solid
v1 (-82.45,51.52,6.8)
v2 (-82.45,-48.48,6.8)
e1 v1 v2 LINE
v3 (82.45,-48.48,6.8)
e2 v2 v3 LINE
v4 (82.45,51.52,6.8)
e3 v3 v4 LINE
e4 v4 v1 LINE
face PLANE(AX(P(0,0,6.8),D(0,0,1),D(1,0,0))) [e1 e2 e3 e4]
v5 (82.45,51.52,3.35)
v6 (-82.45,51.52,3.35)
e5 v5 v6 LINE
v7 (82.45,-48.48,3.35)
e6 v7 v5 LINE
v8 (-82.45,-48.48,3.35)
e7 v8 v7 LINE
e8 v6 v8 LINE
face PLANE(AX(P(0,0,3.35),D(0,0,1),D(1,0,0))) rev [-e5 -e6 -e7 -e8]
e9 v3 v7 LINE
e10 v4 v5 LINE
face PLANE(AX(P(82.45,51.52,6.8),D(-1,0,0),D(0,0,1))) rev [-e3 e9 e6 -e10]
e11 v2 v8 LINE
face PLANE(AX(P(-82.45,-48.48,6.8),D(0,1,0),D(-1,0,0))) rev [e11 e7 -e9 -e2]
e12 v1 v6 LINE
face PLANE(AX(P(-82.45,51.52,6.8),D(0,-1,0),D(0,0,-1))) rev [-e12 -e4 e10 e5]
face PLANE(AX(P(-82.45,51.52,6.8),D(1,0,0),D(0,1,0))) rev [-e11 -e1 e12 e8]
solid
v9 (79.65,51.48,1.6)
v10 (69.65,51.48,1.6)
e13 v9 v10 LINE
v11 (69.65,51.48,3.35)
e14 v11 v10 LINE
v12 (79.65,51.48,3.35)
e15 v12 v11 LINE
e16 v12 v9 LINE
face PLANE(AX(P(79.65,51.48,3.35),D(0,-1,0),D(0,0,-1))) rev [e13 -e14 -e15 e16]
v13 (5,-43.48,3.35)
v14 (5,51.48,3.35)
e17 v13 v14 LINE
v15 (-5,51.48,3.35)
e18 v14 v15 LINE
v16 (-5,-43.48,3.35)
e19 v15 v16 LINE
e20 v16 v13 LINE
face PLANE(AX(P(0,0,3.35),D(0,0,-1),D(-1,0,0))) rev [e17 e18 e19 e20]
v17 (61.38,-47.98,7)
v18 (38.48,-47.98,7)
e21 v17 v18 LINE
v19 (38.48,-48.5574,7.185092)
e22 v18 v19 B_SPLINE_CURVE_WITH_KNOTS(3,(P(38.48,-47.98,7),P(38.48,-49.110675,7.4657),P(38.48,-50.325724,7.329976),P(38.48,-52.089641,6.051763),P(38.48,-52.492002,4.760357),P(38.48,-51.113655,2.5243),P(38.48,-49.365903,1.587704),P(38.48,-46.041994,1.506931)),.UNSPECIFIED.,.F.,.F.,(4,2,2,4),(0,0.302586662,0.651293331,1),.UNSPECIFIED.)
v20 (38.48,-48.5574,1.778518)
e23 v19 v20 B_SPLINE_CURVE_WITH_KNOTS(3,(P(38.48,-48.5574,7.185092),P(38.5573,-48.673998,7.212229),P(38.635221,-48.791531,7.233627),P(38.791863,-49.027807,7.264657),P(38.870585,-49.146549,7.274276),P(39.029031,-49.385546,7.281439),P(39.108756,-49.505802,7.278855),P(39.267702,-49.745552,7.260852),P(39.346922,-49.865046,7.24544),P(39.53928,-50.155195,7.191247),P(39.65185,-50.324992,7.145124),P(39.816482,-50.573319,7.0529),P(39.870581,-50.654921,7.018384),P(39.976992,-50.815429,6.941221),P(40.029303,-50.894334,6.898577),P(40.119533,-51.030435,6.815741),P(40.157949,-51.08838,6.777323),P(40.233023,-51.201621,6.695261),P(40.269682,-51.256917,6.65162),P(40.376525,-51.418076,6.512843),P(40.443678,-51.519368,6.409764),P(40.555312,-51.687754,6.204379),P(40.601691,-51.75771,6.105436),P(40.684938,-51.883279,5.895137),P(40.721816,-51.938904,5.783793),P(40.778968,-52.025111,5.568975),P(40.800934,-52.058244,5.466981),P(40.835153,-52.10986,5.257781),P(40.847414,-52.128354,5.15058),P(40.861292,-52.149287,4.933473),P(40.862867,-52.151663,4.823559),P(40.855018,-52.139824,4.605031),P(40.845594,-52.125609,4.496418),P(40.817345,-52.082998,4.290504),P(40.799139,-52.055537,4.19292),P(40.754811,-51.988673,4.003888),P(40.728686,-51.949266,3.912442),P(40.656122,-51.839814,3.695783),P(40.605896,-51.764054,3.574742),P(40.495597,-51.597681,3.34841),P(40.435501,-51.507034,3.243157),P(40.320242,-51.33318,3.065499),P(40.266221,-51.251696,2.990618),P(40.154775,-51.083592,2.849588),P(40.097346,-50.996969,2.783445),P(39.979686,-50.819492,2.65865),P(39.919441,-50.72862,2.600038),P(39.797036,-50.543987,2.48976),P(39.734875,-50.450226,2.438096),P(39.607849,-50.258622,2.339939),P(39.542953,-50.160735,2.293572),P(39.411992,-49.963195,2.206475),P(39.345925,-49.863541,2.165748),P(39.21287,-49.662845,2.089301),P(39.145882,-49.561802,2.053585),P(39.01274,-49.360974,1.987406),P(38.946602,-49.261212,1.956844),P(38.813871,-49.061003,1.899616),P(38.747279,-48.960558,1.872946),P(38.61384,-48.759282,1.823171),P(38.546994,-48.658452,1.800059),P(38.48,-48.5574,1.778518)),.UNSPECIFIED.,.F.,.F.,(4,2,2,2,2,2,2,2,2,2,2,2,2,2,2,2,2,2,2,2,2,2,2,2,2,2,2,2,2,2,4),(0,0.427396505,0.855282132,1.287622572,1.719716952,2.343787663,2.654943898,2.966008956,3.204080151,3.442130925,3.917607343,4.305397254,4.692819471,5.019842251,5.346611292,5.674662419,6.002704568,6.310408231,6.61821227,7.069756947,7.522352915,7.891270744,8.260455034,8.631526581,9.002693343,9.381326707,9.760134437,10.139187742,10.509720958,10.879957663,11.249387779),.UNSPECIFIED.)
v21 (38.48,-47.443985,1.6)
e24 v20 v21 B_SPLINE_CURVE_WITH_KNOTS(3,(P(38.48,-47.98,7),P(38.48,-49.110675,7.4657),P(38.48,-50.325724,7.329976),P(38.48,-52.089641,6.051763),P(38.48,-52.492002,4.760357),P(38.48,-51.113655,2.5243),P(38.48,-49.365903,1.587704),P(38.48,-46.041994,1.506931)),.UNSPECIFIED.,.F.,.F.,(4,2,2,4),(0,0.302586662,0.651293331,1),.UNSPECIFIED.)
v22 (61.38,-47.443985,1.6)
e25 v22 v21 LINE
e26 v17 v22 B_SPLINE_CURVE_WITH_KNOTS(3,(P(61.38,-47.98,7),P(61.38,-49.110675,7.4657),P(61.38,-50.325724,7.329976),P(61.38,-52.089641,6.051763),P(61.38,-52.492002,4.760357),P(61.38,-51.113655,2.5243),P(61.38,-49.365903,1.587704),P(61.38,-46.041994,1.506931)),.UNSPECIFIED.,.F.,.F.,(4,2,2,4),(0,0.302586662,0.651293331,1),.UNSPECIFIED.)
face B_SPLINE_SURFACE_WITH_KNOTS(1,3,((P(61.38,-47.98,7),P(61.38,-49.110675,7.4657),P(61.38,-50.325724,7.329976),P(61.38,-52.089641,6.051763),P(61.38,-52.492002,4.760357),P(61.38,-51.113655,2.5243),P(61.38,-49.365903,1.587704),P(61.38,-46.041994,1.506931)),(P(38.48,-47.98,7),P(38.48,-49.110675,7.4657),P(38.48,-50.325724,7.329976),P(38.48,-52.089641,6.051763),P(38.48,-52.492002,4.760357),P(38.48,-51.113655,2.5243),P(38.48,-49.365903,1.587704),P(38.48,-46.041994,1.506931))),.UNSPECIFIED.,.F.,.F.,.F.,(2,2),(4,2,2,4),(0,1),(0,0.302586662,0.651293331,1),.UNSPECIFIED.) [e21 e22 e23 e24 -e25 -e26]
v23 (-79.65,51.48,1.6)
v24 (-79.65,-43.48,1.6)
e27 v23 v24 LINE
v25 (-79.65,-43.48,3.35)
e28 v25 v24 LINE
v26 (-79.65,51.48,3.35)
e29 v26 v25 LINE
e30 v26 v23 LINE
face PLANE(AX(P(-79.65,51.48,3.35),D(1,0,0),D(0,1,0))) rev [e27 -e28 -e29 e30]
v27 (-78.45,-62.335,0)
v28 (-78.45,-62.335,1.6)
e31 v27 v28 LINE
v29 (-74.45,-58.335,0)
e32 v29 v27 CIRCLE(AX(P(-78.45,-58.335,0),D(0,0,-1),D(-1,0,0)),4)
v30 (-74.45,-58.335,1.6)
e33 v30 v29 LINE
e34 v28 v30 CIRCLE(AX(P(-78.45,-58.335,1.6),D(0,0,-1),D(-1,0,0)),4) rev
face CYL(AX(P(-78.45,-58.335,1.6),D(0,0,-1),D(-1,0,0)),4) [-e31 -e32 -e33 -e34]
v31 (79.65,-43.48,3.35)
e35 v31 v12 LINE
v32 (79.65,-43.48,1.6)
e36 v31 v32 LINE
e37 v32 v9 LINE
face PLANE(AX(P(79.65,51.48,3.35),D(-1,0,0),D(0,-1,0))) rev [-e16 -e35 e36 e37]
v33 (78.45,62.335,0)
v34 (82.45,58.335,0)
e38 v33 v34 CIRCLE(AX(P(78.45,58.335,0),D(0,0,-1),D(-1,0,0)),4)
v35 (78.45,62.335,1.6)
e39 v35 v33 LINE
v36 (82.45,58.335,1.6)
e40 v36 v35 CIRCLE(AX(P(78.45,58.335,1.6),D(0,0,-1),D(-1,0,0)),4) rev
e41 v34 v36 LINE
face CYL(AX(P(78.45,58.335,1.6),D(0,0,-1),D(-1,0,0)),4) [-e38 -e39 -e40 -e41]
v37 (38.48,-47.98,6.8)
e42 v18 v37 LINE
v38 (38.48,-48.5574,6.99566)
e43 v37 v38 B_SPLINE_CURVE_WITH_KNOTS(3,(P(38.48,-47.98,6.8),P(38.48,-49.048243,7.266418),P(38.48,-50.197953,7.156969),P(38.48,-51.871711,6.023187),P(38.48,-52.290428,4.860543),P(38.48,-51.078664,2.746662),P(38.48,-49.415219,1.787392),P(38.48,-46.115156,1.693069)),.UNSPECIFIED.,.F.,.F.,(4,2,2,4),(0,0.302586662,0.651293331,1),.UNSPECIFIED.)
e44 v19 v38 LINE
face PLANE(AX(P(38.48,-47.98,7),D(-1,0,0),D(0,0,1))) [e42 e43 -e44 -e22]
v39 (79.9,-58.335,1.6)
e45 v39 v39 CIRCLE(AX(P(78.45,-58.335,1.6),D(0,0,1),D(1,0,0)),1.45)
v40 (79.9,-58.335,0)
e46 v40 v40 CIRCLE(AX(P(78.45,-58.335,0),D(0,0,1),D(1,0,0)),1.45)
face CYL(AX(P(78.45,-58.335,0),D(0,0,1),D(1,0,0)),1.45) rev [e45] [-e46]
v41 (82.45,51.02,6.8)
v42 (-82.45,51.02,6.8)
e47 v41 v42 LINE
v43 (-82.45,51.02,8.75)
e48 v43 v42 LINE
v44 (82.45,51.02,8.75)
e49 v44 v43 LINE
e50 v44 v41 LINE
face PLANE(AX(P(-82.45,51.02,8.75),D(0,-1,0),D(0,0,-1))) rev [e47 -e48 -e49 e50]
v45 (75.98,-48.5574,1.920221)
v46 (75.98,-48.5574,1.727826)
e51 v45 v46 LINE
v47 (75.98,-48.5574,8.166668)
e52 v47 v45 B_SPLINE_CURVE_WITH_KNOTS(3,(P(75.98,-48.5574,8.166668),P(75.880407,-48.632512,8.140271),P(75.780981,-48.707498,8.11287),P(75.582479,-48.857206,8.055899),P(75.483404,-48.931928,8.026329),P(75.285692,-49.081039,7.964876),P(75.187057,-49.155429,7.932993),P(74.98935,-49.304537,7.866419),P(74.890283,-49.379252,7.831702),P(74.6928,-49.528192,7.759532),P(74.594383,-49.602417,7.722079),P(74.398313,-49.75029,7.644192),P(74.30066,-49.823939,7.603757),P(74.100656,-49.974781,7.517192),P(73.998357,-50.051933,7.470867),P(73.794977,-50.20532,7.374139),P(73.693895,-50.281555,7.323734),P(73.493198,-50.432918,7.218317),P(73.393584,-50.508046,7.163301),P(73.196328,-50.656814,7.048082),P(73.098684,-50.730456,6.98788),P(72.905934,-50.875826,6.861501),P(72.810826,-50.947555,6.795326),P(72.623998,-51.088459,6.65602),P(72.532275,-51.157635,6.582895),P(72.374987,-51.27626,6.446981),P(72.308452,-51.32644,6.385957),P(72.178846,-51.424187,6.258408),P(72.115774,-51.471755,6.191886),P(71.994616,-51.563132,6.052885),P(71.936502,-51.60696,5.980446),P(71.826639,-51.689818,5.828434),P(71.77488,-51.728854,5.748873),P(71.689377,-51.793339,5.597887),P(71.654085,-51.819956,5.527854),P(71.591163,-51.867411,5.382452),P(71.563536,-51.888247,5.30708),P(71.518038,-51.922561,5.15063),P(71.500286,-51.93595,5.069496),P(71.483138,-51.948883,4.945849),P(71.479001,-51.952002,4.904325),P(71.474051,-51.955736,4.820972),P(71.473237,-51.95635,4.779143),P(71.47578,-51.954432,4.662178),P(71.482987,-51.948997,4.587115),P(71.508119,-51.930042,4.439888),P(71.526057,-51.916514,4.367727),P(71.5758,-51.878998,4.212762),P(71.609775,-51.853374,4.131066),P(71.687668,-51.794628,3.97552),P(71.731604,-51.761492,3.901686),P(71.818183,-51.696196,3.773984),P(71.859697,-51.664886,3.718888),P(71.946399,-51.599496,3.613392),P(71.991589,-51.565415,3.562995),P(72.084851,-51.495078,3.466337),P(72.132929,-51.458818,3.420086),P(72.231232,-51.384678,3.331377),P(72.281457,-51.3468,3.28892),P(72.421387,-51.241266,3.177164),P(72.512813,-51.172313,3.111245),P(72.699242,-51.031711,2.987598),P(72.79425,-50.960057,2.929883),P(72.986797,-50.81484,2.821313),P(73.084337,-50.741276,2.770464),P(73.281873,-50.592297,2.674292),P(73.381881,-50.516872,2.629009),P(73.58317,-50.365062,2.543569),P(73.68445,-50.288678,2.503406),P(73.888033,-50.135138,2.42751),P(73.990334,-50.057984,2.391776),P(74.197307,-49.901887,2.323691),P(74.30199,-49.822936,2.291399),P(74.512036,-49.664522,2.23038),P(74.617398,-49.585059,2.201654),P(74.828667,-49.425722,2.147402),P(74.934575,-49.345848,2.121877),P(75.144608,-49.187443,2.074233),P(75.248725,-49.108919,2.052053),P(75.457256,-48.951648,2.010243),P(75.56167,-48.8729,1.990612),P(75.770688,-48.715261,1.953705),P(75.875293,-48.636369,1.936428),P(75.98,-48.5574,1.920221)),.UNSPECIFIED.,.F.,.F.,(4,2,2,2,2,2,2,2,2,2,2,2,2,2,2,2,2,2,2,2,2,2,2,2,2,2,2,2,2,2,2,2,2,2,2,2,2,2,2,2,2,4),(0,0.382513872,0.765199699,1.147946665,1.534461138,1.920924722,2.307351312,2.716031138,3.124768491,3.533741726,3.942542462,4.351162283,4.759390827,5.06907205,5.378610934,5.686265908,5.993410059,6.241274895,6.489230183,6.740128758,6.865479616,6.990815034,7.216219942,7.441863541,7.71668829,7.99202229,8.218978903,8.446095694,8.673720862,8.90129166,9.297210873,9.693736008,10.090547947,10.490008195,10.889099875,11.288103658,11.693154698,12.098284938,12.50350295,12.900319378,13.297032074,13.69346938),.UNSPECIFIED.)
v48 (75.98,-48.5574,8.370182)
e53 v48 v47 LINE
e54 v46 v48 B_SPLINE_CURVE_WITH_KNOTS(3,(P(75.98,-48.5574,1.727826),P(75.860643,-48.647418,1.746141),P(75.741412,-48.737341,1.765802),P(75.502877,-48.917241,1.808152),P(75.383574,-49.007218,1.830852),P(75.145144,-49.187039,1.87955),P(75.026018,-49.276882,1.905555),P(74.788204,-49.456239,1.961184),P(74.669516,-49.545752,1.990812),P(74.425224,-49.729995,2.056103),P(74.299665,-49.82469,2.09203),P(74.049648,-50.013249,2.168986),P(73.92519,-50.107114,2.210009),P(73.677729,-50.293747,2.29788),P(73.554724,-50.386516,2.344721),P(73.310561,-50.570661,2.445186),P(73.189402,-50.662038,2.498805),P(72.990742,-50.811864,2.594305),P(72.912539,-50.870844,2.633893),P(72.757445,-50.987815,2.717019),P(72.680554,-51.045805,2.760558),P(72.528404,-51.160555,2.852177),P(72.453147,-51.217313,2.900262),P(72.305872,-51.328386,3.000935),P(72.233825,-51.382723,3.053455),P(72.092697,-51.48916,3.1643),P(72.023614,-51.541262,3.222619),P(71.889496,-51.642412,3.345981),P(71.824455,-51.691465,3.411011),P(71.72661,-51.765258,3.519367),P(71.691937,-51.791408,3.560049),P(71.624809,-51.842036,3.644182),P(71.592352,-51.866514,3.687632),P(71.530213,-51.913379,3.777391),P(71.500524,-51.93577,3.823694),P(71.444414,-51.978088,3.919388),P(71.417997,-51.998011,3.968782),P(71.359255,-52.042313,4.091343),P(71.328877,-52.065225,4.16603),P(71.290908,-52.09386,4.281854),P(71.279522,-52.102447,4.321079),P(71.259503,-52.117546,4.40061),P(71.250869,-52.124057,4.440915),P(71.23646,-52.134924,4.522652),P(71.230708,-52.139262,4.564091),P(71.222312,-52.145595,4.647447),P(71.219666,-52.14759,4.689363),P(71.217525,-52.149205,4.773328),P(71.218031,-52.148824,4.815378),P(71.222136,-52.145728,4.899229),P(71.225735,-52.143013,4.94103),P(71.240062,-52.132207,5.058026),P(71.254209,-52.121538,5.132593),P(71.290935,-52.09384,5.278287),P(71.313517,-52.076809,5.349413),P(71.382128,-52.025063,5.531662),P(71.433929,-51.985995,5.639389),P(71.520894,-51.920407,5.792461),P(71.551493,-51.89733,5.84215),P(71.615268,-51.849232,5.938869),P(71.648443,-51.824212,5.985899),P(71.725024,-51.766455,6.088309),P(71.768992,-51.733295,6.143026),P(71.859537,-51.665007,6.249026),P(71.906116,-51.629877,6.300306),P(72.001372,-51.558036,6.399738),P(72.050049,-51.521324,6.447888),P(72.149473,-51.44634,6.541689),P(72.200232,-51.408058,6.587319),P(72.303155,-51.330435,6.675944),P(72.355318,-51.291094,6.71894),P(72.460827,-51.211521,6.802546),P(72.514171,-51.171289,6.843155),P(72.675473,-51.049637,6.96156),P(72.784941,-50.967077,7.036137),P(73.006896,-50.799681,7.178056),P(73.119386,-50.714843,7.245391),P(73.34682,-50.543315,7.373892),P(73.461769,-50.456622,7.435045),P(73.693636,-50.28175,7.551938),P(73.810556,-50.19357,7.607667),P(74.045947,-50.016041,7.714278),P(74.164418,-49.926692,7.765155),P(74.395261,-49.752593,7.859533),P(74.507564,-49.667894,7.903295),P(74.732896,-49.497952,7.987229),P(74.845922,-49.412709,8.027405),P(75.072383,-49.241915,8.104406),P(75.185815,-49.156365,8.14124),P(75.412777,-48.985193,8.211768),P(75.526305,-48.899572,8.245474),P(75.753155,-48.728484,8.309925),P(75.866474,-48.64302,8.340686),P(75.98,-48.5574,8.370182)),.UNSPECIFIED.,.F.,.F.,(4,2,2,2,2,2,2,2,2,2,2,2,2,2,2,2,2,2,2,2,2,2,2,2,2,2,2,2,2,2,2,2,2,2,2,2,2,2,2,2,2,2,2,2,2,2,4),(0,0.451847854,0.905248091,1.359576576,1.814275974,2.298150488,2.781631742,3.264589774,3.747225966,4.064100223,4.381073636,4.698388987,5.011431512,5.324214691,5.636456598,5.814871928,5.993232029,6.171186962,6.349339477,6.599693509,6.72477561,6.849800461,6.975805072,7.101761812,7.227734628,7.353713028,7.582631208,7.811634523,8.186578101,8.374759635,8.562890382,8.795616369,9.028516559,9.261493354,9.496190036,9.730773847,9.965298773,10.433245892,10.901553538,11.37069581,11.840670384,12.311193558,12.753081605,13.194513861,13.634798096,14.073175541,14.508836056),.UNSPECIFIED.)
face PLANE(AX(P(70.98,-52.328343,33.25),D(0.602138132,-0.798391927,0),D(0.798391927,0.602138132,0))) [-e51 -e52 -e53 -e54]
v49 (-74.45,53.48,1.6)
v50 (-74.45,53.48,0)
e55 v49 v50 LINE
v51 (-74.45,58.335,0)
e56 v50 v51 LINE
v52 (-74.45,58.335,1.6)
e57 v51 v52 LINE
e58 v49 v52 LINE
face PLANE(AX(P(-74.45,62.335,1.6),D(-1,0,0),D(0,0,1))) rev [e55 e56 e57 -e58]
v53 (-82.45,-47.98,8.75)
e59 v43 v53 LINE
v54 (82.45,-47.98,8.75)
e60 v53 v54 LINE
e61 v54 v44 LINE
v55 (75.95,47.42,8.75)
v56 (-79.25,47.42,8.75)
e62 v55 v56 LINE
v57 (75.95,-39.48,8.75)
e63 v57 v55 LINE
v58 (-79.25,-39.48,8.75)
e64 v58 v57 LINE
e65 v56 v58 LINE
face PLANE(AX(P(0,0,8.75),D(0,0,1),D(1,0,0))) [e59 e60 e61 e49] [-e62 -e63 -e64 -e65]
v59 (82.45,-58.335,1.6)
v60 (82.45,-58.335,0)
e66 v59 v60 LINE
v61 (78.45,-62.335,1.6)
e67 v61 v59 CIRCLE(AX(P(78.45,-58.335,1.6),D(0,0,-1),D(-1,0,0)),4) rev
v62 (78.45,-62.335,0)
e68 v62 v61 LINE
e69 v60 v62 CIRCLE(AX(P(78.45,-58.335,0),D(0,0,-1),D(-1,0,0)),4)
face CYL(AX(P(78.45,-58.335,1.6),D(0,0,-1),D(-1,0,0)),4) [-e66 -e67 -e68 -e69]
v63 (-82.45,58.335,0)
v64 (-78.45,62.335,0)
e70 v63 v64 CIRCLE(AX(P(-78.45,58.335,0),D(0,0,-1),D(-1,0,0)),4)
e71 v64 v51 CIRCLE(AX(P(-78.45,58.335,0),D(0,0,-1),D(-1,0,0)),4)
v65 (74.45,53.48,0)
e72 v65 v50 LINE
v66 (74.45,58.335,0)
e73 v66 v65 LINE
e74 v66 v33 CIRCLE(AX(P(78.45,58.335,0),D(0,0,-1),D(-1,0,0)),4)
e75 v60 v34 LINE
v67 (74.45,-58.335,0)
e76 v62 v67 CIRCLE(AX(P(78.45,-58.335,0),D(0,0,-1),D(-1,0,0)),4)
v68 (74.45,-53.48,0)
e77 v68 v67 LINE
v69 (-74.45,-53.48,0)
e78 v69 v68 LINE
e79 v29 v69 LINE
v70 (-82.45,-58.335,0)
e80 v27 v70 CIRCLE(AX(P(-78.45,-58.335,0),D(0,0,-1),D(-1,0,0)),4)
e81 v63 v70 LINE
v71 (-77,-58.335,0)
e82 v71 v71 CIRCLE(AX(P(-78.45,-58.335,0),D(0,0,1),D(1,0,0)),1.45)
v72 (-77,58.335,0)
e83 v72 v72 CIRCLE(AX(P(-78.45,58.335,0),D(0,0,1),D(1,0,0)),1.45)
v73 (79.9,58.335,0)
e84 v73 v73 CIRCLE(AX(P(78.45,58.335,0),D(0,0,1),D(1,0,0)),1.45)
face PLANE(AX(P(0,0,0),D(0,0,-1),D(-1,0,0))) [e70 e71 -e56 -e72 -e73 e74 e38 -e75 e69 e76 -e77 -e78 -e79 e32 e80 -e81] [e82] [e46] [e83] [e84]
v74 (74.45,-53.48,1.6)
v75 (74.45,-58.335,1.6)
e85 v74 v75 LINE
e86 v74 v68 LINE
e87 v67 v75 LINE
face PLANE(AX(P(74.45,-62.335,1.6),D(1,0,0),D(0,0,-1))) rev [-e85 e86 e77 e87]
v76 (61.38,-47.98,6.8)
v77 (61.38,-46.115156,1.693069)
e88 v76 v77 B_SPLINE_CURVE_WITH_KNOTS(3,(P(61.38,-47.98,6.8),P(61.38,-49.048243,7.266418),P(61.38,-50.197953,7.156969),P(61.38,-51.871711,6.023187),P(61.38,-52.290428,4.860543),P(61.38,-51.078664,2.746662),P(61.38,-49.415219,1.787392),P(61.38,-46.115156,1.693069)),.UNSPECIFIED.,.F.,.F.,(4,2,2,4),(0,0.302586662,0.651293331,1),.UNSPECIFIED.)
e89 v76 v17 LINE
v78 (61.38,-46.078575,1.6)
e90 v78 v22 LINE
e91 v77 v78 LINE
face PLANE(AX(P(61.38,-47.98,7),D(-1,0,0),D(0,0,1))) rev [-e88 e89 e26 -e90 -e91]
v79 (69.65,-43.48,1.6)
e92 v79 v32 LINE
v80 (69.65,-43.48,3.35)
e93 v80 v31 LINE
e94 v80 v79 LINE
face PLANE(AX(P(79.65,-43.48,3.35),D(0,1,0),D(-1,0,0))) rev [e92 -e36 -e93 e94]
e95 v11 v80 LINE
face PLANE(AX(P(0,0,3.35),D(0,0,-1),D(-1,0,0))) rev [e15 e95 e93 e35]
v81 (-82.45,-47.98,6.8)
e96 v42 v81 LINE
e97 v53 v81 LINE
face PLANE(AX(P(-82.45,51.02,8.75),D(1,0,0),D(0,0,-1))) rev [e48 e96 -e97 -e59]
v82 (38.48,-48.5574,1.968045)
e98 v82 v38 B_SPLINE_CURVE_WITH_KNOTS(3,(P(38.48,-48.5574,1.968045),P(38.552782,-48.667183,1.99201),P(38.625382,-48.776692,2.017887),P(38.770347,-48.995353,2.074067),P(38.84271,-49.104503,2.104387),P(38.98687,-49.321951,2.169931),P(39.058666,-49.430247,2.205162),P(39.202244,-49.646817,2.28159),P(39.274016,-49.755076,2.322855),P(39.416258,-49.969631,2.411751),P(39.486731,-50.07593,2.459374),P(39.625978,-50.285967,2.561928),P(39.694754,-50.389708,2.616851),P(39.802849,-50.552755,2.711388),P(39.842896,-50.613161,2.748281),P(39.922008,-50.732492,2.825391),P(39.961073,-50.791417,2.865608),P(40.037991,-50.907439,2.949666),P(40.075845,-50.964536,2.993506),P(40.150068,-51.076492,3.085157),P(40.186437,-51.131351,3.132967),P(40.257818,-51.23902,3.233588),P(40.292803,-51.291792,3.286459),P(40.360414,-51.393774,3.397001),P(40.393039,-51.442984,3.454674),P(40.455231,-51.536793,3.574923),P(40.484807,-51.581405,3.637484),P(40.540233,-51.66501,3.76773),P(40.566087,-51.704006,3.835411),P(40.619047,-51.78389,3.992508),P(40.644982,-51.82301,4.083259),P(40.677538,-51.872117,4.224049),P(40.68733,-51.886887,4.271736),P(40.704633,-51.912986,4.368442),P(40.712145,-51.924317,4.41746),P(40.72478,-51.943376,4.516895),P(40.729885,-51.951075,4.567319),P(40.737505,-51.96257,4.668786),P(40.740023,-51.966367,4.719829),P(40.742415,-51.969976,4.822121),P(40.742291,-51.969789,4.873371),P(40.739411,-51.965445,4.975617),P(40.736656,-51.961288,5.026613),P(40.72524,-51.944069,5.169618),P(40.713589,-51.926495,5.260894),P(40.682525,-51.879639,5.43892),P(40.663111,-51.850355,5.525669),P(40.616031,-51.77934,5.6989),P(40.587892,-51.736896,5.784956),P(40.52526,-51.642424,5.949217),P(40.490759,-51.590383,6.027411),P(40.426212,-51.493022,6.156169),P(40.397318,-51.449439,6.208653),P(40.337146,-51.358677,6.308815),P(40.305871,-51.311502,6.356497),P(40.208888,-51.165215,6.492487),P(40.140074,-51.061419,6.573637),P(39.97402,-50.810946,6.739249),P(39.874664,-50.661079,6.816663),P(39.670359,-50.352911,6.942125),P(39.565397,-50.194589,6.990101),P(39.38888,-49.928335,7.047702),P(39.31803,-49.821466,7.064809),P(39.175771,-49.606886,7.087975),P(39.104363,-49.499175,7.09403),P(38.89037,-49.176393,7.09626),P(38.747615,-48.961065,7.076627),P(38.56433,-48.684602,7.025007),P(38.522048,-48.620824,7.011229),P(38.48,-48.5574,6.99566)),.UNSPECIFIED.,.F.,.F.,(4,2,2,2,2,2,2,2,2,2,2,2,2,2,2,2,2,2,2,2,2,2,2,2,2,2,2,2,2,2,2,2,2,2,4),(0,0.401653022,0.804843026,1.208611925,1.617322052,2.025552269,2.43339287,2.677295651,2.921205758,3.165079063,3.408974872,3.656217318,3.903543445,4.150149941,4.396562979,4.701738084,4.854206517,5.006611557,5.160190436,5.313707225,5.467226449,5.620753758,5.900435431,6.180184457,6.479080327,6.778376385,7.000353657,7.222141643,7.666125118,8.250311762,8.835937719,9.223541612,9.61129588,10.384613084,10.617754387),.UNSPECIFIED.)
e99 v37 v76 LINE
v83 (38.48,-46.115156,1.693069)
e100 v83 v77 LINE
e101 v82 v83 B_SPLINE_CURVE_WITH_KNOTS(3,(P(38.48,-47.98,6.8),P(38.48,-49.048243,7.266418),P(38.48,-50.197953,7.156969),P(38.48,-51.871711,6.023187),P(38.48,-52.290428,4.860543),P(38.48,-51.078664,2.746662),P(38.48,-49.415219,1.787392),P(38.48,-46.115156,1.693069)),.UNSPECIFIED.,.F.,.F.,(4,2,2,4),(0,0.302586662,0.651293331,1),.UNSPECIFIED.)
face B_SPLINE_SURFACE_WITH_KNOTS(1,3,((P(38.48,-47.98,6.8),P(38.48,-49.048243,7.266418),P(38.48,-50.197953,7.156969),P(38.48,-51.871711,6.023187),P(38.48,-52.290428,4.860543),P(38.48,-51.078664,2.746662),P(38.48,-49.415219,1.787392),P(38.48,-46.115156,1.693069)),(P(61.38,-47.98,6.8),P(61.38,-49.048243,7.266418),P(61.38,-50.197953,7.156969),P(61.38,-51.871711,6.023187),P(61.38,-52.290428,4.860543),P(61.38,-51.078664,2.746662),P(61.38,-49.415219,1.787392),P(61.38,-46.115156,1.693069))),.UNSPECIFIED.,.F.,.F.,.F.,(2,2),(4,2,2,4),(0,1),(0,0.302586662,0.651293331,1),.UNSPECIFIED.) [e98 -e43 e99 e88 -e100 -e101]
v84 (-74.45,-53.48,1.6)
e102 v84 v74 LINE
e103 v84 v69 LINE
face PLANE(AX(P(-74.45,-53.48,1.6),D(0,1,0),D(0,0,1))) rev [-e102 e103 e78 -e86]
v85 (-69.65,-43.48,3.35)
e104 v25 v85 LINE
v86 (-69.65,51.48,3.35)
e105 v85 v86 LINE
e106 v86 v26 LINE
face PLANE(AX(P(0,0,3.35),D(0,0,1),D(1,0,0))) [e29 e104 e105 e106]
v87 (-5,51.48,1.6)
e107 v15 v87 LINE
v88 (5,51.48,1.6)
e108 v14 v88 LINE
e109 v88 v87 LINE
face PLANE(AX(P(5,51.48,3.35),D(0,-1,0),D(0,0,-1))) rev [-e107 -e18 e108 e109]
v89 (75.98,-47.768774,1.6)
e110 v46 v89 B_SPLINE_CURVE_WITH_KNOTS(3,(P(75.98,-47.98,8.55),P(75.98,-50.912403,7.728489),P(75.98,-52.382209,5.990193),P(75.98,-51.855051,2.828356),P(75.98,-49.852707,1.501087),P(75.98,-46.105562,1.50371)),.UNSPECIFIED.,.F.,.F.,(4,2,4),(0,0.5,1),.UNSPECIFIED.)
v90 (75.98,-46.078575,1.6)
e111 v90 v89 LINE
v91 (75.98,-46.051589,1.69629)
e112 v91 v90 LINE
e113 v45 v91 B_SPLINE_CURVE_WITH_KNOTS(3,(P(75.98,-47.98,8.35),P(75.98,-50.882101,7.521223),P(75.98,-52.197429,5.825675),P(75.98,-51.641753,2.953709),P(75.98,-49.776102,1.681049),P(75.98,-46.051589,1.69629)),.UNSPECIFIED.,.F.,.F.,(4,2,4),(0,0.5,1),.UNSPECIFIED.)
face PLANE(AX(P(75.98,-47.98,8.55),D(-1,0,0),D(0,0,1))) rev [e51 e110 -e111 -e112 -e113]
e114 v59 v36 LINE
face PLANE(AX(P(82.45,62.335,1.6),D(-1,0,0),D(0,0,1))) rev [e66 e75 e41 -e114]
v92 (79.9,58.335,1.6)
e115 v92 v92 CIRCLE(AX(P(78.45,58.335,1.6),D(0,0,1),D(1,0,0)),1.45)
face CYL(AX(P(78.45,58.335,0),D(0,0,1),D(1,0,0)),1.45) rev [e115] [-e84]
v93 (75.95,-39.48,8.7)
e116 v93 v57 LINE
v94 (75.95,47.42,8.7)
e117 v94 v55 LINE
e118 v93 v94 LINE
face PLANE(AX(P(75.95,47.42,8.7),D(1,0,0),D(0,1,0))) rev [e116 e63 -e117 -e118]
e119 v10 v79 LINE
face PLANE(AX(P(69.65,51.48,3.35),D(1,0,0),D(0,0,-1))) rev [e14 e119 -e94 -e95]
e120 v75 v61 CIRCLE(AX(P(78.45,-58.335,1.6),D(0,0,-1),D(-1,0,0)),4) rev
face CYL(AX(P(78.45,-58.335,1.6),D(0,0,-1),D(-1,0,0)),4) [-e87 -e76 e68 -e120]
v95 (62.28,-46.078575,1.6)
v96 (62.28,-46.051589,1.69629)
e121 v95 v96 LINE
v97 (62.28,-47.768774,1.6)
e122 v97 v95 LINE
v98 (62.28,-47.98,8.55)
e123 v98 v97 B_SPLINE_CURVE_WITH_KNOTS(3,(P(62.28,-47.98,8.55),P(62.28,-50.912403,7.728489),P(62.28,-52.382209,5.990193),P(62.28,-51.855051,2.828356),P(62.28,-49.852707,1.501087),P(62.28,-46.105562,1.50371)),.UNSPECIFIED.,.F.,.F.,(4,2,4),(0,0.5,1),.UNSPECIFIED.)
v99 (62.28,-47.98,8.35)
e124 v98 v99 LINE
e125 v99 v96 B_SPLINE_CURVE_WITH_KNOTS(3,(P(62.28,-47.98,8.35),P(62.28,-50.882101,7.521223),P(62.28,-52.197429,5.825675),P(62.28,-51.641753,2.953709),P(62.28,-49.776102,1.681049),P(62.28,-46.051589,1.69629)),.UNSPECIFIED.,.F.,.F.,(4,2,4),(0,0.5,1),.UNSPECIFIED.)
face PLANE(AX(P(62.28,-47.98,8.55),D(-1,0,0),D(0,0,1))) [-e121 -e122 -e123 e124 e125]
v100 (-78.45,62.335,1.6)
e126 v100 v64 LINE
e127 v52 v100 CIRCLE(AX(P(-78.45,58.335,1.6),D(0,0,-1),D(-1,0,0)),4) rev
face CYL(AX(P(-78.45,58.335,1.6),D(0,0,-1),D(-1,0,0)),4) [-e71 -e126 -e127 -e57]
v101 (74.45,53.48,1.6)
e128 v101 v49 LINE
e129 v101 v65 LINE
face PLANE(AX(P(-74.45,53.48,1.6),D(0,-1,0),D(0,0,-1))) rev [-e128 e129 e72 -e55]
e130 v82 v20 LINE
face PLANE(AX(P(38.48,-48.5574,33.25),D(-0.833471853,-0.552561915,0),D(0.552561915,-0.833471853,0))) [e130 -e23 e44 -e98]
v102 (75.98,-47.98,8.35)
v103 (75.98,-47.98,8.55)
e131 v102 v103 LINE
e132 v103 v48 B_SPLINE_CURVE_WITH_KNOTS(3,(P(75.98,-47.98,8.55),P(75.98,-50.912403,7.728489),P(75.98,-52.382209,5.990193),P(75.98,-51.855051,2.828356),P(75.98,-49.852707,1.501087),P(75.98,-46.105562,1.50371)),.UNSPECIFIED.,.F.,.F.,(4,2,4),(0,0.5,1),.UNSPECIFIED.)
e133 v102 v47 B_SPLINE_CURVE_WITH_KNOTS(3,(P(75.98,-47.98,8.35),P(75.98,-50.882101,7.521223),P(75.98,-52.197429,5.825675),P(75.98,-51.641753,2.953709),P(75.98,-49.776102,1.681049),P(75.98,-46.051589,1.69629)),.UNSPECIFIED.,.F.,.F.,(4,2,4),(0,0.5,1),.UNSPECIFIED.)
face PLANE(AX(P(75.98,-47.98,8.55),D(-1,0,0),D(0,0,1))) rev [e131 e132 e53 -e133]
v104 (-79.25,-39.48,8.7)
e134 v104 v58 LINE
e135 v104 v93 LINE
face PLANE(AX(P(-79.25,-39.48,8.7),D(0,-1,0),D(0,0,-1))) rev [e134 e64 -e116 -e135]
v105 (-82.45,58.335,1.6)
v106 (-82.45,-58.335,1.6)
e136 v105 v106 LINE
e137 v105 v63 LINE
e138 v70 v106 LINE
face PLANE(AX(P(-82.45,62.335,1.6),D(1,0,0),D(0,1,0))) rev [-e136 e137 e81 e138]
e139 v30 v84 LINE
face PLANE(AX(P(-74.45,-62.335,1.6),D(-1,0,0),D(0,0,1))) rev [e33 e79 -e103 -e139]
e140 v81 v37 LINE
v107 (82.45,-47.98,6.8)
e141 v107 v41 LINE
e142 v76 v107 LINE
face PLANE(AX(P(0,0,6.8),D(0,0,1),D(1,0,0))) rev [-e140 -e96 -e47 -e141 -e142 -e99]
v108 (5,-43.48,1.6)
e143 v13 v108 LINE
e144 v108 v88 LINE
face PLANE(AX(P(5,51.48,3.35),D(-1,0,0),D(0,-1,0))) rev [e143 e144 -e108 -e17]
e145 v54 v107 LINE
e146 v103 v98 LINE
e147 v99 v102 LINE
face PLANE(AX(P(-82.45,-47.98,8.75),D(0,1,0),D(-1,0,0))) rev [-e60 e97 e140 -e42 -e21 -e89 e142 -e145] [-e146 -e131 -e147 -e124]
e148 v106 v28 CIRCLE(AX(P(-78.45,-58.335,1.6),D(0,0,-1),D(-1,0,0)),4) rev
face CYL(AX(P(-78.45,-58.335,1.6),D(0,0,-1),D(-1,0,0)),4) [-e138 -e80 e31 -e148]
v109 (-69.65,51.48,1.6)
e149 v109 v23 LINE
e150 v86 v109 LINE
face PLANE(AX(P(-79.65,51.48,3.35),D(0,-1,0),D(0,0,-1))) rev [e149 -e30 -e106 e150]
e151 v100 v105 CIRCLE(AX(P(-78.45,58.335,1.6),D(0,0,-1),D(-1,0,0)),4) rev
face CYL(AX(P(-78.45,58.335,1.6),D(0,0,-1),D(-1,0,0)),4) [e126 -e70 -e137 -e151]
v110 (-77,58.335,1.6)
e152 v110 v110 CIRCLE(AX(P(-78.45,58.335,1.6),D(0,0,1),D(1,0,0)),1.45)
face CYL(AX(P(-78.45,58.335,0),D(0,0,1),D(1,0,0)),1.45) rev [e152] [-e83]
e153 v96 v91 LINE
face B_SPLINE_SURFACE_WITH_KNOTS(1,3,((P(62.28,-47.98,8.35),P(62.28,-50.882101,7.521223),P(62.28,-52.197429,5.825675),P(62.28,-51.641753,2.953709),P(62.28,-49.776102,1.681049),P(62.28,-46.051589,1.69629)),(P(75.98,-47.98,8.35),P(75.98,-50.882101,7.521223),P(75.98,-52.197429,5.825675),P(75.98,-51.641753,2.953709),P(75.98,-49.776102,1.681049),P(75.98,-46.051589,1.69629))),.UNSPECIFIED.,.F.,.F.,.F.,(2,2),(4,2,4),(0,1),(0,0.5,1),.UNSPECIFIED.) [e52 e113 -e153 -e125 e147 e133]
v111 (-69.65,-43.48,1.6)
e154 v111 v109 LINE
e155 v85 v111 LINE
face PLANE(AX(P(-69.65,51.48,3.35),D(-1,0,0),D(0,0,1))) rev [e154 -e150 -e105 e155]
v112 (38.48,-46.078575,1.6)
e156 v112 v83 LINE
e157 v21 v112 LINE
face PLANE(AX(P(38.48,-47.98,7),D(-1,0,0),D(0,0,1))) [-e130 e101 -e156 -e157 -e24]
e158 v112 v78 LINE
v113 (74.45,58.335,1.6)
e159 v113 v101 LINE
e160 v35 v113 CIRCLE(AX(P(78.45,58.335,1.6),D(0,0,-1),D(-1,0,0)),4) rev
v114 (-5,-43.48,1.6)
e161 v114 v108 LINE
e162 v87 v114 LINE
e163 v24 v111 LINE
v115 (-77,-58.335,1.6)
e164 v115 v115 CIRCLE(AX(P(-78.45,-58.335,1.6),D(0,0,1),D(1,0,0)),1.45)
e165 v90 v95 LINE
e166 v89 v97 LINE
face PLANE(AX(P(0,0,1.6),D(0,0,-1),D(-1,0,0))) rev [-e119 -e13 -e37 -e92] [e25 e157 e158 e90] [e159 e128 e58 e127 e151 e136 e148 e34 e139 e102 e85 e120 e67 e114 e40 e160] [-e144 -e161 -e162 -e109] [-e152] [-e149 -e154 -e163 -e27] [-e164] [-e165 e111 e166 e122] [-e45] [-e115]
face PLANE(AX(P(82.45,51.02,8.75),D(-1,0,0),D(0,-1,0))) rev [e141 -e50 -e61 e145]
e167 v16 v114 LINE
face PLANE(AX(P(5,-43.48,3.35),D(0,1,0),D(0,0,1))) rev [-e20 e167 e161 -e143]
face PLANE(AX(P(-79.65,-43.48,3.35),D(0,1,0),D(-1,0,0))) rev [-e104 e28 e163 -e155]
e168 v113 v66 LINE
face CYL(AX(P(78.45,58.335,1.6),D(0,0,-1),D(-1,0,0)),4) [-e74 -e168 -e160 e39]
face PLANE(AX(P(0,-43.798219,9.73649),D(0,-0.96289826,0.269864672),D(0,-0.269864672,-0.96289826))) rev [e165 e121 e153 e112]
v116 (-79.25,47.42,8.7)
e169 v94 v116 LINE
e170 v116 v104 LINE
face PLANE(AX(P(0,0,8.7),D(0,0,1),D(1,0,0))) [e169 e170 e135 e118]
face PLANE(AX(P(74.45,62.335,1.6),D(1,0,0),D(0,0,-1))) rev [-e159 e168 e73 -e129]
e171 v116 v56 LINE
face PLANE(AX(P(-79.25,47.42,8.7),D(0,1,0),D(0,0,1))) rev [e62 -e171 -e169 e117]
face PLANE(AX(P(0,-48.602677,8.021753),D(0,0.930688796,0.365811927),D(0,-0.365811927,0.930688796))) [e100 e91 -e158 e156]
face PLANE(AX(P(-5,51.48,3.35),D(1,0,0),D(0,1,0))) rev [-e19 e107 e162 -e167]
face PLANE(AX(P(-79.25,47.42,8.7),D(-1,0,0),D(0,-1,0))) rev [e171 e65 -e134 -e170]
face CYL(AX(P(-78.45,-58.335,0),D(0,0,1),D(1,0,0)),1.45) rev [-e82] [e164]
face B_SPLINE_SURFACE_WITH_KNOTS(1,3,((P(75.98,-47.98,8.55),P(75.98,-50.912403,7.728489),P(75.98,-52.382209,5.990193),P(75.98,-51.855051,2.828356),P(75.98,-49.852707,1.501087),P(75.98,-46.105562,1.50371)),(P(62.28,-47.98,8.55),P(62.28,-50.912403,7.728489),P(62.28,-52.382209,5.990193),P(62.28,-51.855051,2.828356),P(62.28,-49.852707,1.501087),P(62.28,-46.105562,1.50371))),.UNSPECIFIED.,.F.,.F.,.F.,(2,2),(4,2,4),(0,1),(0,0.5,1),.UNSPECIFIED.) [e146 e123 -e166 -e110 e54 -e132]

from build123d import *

# Parameters (mm, degrees)
PCBA_DEPTH         = 1.6
FILLET1_R          = 4
SKETCH2_R          = 1.45
SCREWHOLE_DEPTH    = 104.374149211
SKETCH5_W          = 10
SKETCH5_H          = 94.96
TAPE_DEPTH         = 1.75
SKETCH6_W          = 164.9
SKETCH6_H          = 100
BACKLIGHT_DEPTH    = 3.45
SKETCH7_W          = 164.9
SKETCH7_H          = 99
LCDNTOUCH_DEPTH    = 1.95
SWEEP1_START       = 62.28
SWEEP1_DEPTH       = 13.7
SWEEP2_START       = 38.48
SWEEP2_DEPTH       = 22.9
CUT_EXTRUDE3_DEPTH = 31.65
SKETCH16_W         = 155.2
SKETCH16_H         = 86.9
CUT_EXTRUDE4_DEPTH = 0.05


# Read off the part's stored shape, not the designer's step: Sweep1, Sweep2
with BuildPart() as part:
    # Sketch1 → PCBA (new body)
    with BuildSketch(Plane.XY):
        Polygon((74.45, 62.335), (82.45, 62.335), (82.45, -62.335), (74.45, -62.335), (74.45, -53.48), (-74.45, -53.48), (-74.45, -62.335), (-82.45, -62.335), (-82.45, 62.335), (-74.45, 62.335), (-74.45, 53.48), (74.45, 53.48), align=None)
    extrude(amount=PCBA_DEPTH)

    # Fillet1
    fillet1_edges = [part.edges().sort_by_distance(p)[0] for p in [
        (-82.45, 62.335, 0.8),
        (-74.45, 62.335, 0.8),
        (-82.45, -62.335, 0.8),
        (-74.45, -62.335, 0.8),
        (74.45, -62.335, 0.8),
        (82.45, -62.335, 0.8),
        (74.45, 62.335, 0.8),
        (82.45, 62.335, 0.8),
    ]]
    fillet(fillet1_edges, radius=FILLET1_R - 0.0001)  # a hair under: the kernel refuses the full size

    # Sketch2 → ScrewHole (cut, through all)
    with BuildSketch(Plane.XY.offset(1.6)):
        with Locations((-78.45, 58.335)):
            Circle(SKETCH2_R)
        with Locations((78.45, 58.335)):
            Circle(SKETCH2_R)
        with Locations((78.45, -58.335)):
            Circle(SKETCH2_R)
        with Locations((-78.45, -58.335)):
            Circle(SKETCH2_R)
    extrude(amount=-SCREWHOLE_DEPTH, mode=Mode.SUBTRACT)

    # Sketch5 → Tape (add)
    with BuildSketch(Plane.XY.offset(1.6)):
        with Locations((-74.65, 4)):
            Rectangle(SKETCH5_W, SKETCH5_H)
        with Locations((74.65, 4)):
            Rectangle(SKETCH5_W, SKETCH5_H)
        with Locations((0, 4)):
            Rectangle(SKETCH5_W, SKETCH5_H)
    extrude(amount=TAPE_DEPTH)



with BuildPart() as body_2:
    # Sketch6 → Backlight (new body)
    with BuildSketch(Plane.XY.offset(3.35)):
        with Locations((0, 1.52)):
            Rectangle(SKETCH6_W, SKETCH6_H)
    extrude(amount=BACKLIGHT_DEPTH)


with BuildPart() as body_3:
    # Sketch7 → LCDnTouch (new body)
    with BuildSketch(Plane.XY.offset(6.8)):
        with Locations((0, 1.52)):
            Rectangle(SKETCH7_W, SKETCH7_H)
    extrude(amount=LCDNTOUCH_DEPTH)


with BuildPart() as part_1:
    add(part.part)

    add(body_3.part)  # Sweep1 merges body 3
    # Sweep1 outline → Sweep1 (add)
    with BuildSketch(Plane.YZ.offset(SWEEP1_START)):
        with BuildLine():
            Line((-47.98, 8.35), (-47.98, 8.55))
            add(Edge.make_bspline(
                [(-47.98, 8.55), (-50.912403456, 7.72848927), (-52.382208971, 5.990192913), (-51.897184373, 3.081064394), (-50.448425543, 1.931894606), (-47.768774159, 1.6)],
                knots=[0, 0, 0, 0, 0.5, 0.5, 0.920075321, 0.920075321, 0.920075321, 0.920075321], degree=3))
            Line((-47.768774159, 1.6), (-46.078575055, 1.6))
            Line((-46.078575055, 1.6), (-46.051588588, 1.696289826))
            add(Edge.make_bspline(
                [(-47.98, 8.35), (-50.882100743, 7.521222553), (-52.197429111, 5.825675212), (-51.641753238, 2.953709182), (-49.776101832, 1.681049132), (-46.051588588, 1.696289826)],
                knots=[0, 0, 0, 0, 0.5, 0.5, 1, 1, 1, 1], degree=3))
        make_face()
    extrude(amount=SWEEP1_DEPTH)

    # Sweep2 outline → Sweep2 (add)
    with BuildSketch(Plane.YZ.offset(SWEEP2_START)):
        with BuildLine():
            Line((-47.98, 6.8), (-47.98, 7))
            add(Edge.make_bspline(
                [(-47.98, 7), (-49.110675347, 7.46570031), (-50.32572409, 7.329976113), (-52.089641205, 6.051762932), (-52.492002459, 4.760357324), (-51.217904856, 2.693421448), (-49.870436377, 1.875208104), (-47.443985346, 1.6)],
                knots=[0, 0, 0, 0, 0.302586662, 0.302586662, 0.651293331, 0.651293331, 0.947252102, 0.947252102, 0.947252102, 0.947252102], degree=3))
            Line((-47.443985346, 1.6), (-46.078575055, 1.6))
            Line((-46.078575055, 1.6), (-46.115156248, 1.69306888))
            add(Edge.make_bspline(
                [(-47.98, 6.8), (-49.048242707, 7.266417976), (-50.197952574, 7.156968521), (-51.871711427, 6.023186847), (-52.290428411, 4.86054287), (-51.078664372, 2.746662369), (-49.41521941, 1.78739192), (-46.115156248, 1.69306888)],
                knots=[0, 0, 0, 0, 0.302586662, 0.302586662, 0.651293331, 0.651293331, 1, 1, 1, 1], degree=3))
        make_face()
    extrude(amount=SWEEP2_DEPTH)

    # Sketch15 → Cut-Extrude3 (cut)
    with BuildSketch(Plane.XY.offset(1.6)):
        Polygon((38.48, -48.557400222), (40.98, -52.328343488), (70.98, -52.328343488), (75.98, -48.557400222), (75.98, -53.138786489), (38.248743189, -53.138786489), (38.248743189, -48.557400222), align=None)
    extrude(amount=CUT_EXTRUDE3_DEPTH, mode=Mode.SUBTRACT)

    # Sketch16 → Cut-Extrude4 (cut)
    with BuildSketch(Plane.XY.offset(8.75)):
        with Locations((-1.65, 3.97)):
            Rectangle(SKETCH16_W, SKETCH16_H)
    extrude(amount=-CUT_EXTRUDE4_DEPTH, mode=Mode.SUBTRACT)


solid = Compound([body_2.part, part_1.part])
